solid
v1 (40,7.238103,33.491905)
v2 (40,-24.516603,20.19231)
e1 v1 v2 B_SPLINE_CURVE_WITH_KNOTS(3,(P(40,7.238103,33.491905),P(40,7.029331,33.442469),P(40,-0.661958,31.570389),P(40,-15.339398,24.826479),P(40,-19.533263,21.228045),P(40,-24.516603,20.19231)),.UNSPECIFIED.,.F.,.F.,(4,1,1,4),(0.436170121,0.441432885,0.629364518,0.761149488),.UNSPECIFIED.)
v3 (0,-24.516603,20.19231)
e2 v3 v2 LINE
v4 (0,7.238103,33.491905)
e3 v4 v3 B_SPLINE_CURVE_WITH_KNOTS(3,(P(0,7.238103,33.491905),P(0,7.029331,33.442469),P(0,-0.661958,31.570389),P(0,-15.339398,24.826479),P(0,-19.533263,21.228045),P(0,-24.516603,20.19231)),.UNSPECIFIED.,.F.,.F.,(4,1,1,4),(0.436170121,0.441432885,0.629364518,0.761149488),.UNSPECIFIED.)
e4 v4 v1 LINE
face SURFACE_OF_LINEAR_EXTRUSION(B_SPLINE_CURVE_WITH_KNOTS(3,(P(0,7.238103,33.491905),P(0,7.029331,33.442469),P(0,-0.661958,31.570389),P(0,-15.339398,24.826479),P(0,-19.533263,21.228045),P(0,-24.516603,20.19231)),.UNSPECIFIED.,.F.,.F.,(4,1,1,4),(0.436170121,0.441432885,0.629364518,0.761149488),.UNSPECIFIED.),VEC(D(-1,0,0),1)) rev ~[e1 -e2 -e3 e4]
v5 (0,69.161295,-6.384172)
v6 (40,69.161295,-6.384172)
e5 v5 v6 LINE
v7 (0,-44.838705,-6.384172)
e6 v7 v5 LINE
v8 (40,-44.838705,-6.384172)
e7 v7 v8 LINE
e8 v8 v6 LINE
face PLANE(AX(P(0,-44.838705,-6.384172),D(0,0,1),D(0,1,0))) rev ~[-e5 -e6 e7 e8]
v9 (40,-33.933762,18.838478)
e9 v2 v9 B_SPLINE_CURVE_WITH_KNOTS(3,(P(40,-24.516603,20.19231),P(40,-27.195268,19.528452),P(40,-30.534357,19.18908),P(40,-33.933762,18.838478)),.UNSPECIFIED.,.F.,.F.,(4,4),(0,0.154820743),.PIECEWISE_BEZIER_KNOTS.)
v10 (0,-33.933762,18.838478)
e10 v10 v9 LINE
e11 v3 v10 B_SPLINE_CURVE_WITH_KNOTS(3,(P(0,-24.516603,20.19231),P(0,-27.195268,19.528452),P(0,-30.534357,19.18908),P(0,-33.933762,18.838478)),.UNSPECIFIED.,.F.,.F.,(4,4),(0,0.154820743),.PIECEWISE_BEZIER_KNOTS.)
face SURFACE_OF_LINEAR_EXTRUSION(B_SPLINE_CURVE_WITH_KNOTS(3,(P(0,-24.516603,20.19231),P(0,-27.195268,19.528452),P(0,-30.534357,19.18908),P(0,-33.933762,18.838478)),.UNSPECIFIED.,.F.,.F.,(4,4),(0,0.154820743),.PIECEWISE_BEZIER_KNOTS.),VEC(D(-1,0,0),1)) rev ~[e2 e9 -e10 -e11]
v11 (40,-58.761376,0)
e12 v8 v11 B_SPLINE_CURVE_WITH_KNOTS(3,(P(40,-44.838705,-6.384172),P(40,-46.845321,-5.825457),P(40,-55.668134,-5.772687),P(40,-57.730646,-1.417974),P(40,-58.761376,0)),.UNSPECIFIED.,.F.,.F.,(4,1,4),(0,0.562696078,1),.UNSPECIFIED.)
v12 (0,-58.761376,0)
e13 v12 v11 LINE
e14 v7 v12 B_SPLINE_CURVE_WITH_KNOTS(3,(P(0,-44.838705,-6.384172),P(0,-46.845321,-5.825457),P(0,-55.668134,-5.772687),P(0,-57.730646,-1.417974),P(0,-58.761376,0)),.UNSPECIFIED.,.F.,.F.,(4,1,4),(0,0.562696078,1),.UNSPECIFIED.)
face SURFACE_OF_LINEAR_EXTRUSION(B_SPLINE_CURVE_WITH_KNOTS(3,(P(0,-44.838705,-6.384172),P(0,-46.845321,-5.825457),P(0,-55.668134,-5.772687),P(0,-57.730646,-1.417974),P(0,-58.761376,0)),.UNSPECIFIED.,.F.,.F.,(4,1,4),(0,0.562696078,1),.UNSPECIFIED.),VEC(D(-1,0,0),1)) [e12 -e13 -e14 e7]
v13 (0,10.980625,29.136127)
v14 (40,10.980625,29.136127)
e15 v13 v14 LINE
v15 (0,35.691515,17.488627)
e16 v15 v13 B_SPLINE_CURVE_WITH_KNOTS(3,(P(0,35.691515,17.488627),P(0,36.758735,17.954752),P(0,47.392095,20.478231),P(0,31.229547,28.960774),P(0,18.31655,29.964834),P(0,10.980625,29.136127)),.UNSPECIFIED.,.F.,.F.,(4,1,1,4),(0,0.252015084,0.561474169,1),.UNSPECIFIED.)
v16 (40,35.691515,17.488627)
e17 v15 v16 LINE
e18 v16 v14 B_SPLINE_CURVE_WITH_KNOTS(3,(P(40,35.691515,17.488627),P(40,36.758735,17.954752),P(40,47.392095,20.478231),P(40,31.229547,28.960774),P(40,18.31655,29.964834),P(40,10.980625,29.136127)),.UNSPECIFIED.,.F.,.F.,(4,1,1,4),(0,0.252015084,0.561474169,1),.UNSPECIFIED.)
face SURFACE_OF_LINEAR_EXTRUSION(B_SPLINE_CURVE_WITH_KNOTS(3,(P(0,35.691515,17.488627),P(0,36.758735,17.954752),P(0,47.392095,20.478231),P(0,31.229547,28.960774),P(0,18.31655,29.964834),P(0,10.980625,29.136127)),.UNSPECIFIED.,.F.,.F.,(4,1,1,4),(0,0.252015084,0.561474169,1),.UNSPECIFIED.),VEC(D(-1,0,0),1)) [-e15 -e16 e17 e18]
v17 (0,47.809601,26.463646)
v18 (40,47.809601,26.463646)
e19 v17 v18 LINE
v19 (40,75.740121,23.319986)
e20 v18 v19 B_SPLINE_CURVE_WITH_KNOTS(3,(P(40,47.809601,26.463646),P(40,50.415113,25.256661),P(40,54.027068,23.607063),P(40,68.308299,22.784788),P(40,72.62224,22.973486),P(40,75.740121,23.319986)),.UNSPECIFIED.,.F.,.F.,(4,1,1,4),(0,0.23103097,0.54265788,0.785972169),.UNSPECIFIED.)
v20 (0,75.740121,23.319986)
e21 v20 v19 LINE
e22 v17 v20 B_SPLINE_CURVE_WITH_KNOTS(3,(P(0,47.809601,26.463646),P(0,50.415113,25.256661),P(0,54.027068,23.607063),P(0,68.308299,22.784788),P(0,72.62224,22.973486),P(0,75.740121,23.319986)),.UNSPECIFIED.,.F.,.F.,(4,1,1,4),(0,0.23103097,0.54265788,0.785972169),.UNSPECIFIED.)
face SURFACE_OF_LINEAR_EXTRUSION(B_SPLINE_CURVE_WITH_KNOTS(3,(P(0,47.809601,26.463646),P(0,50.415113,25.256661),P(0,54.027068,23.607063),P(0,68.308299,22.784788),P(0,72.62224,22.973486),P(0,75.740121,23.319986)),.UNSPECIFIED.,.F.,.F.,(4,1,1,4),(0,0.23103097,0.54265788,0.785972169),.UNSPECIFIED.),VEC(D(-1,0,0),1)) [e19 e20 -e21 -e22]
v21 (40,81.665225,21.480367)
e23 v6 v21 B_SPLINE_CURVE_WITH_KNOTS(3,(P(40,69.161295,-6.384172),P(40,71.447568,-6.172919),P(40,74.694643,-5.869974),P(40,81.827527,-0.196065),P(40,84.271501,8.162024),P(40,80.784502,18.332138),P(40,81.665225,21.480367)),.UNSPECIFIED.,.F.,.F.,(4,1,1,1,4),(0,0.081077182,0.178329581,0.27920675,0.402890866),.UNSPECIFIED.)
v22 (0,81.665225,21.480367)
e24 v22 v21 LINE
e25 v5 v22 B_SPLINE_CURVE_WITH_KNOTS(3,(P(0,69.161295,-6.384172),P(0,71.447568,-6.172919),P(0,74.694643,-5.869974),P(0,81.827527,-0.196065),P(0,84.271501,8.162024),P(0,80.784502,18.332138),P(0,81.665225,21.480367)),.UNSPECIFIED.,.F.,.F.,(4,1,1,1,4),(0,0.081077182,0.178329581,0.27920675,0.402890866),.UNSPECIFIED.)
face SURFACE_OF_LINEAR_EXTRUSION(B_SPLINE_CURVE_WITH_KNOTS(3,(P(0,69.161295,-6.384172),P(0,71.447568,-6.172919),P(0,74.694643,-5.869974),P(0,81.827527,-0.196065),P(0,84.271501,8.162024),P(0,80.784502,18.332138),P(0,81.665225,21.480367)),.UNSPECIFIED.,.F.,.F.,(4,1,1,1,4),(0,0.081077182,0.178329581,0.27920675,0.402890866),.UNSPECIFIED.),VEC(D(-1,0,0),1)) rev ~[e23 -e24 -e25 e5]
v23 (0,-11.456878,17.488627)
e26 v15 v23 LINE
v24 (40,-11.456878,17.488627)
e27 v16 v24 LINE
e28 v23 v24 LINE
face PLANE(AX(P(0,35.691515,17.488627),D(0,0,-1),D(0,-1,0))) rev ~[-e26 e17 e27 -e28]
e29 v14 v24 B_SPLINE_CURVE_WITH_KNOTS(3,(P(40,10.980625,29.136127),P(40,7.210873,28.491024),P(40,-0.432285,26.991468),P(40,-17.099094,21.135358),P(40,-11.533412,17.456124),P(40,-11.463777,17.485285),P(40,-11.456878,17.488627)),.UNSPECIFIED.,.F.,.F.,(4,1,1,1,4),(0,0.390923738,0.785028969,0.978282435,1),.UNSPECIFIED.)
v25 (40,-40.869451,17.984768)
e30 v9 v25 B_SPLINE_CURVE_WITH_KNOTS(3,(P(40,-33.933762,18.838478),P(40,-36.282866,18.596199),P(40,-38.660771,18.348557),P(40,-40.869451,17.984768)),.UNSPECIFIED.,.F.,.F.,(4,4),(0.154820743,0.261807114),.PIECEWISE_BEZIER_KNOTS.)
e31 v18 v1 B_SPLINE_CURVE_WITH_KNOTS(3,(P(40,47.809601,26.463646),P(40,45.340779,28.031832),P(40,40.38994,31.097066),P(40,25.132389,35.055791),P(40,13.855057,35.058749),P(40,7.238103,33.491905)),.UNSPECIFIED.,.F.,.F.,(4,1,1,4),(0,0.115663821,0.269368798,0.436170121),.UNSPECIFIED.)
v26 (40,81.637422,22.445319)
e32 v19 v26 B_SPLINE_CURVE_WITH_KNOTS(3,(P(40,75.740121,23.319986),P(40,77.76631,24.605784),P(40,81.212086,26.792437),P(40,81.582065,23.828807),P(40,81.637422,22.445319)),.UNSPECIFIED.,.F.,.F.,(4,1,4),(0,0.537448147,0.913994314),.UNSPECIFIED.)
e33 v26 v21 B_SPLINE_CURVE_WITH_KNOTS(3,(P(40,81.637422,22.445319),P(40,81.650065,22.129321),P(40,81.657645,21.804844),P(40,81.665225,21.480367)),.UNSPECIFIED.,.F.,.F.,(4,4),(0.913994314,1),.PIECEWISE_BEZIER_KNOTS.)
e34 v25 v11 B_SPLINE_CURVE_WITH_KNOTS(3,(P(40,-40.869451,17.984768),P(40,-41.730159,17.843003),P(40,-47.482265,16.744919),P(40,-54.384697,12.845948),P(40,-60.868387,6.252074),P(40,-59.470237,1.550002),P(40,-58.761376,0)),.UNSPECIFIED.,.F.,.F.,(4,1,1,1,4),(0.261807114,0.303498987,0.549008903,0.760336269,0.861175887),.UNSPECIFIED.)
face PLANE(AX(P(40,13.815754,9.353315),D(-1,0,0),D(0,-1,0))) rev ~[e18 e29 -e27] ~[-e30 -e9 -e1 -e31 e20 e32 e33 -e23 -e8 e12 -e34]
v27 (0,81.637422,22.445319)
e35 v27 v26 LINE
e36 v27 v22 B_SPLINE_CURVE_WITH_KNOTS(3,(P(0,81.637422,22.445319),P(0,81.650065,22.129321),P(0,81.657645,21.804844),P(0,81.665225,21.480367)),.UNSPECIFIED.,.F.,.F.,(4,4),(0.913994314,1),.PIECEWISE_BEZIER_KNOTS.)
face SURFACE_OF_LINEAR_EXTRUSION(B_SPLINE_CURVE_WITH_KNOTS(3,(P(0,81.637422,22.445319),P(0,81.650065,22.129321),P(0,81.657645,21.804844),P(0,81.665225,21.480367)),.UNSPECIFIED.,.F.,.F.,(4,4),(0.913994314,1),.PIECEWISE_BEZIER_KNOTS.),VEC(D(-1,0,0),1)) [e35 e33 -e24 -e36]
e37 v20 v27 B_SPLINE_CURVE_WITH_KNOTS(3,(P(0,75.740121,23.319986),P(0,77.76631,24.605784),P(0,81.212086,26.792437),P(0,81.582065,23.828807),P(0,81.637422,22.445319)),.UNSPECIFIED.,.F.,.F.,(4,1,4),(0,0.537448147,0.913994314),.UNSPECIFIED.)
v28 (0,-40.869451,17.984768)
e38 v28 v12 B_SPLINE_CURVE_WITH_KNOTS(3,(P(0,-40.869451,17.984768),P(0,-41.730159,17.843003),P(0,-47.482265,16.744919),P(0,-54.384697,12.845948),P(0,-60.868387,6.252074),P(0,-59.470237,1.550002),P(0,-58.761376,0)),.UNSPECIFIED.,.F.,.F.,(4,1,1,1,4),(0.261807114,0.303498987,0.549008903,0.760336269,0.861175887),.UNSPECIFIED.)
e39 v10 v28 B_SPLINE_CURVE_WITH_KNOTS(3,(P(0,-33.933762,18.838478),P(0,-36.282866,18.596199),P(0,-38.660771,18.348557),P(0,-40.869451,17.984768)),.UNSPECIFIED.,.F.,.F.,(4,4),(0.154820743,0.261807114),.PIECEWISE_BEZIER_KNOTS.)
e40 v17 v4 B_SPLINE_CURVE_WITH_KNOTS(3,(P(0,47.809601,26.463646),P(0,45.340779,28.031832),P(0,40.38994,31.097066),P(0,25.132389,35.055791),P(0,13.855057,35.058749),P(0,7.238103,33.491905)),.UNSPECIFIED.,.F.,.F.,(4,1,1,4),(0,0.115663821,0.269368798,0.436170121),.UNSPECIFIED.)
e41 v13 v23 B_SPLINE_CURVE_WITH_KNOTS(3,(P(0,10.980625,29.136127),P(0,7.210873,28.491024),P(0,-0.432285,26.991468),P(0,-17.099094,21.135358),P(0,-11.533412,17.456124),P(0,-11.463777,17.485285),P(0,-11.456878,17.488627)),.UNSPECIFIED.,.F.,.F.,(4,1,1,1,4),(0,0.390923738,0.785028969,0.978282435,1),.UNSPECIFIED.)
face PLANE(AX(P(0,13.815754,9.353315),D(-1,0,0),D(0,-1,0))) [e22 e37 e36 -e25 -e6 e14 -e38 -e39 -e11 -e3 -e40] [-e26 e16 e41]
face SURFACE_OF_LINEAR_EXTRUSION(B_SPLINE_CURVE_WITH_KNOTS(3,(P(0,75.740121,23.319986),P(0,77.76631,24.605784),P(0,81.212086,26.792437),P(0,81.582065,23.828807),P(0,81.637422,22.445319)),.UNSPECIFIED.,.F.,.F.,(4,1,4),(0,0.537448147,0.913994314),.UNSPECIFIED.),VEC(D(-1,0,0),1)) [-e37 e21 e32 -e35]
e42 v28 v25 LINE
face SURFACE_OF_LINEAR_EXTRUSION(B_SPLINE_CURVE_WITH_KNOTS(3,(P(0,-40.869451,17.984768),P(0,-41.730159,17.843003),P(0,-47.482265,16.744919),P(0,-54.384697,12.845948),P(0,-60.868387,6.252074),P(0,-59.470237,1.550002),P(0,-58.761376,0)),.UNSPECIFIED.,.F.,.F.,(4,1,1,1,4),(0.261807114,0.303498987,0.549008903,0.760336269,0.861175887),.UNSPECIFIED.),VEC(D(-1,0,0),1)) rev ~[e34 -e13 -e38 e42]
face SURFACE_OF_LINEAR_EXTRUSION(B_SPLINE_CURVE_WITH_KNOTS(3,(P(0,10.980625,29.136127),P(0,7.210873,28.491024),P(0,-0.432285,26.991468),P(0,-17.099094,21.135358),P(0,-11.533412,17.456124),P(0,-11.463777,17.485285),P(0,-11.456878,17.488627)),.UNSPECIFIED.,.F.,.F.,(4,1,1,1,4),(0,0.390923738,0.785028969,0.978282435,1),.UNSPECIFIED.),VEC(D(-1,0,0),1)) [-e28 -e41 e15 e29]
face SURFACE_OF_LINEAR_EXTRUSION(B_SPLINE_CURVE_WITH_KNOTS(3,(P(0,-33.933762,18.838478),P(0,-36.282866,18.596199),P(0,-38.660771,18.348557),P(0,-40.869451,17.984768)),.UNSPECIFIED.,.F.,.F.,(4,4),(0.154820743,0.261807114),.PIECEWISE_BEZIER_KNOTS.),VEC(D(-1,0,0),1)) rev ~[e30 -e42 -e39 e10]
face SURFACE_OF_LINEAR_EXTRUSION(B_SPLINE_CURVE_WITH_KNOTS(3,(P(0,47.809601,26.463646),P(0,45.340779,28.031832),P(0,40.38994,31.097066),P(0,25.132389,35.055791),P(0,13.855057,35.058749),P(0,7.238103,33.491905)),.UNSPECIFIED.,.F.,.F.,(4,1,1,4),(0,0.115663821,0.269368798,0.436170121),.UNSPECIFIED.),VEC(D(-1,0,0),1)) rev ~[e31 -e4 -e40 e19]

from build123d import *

# Parameters (mm, degrees)
F1_DEPTH = 40


with BuildPart() as f1:
    # F0 (on Right) → F1 (new body)
    with BuildSketch(Plane.YZ):
        with BuildLine():
            add(Edge.make_bspline(
                [(-44.838704501, -6.3841724768), (-46.8453205455, -5.825457283), (-55.6681341229, -5.7726866527), (-57.7306464731, -1.4179735635), (-58.7613759126, 0)],
                knots=[0, 0, 0, 0, 0.5626960778, 1, 1, 1, 1], degree=3))
            Line((-44.838704501, -6.3841724768), (69.161295499, -6.3841724768))
            add(Edge.make_bspline(
                [(69.161295499, -6.3841724768), (71.4475678954, -6.1729190484), (74.6946425338, -5.8699737813), (81.8275271025, -0.1960649024), (84.2715006558, 8.1620243826), (80.7845015237, 18.3321377417), (81.6652249495, 21.4803665876)],
                knots=[0, 0, 0, 0, 0.0810771817, 0.1783295809, 0.2792067504, 0.4028908662, 0.4028908662, 0.4028908662, 0.4028908662], degree=3))
            add(Edge.make_bspline(
                [(81.6374216797, 22.4453190982), (81.6500654198, 22.1293211952), (81.6576451847, 21.8048438914), (81.6652249495, 21.4803665876)],
                knots=[0.9139943138, 0.9139943138, 0.9139943138, 0.9139943138, 1, 1, 1, 1], degree=3))
            add(Edge.make_bspline(
                [(75.7401209274, 23.3199857175), (78.0850621891, 23.5805863979), (81.1237295684, 23.990384777), (81.6374216797, 22.4453190982)],
                knots=[0.7859721691, 0.7859721691, 0.7859721691, 0.7859721691, 0.9689675221, 0.9689675221, 0.9689675221, 0.9689675221], degree=3))
            add(Edge.make_bspline(
                [(47.8096007504, 26.4636462757), (50.4151132719, 25.2566612425), (54.0270677376, 23.6070629686), (68.3082992802, 22.7847875979), (72.6222400219, 22.9734858293), (75.7401209274, 23.3199857175)],
                knots=[0, 0, 0, 0, 0.2310309702, 0.5426578797, 0.7859721691, 0.7859721691, 0.7859721691, 0.7859721691], degree=3))
            add(Edge.make_bspline(
                [(47.8096007504, 26.4636462757), (38.9469496949, 27.2014516696), (19.8383470871, 30.9230949853), (7.2381034379, 33.4919049177)],
                knots=[0.7500808852, 0.7500808852, 0.7500808852, 0.7500808852, 0.9114828872, 0.9114828872, 0.9114828872, 0.9114828872], degree=3))
            add(Edge.make_bspline(
                [(7.2381034379, 33.4919049177), (7.0293313069, 33.4424692791), (-0.6619575082, 31.5703885813), (-15.3393975904, 24.8264789662), (-19.5332629376, 21.2280452336), (-24.5166032072, 20.1923100725)],
                knots=[0.4361701211, 0.4361701211, 0.4361701211, 0.4361701211, 0.4414328852, 0.6293645181, 0.7611494878, 0.7611494878, 0.7611494878, 0.7611494878], degree=3))
            add(Edge.make_bspline(
                [(-24.5166032072, 20.1923100725), (-27.1952683602, 19.5284516677), (-30.5343573496, 19.1890804899), (-33.9337619399, 18.8384775563)],
                knots=[0, 0, 0, 0, 0.1548207433, 0.1548207433, 0.1548207433, 0.1548207433], degree=3))
            add(Edge.make_bspline(
                [(-33.9337619399, 18.8384775563), (-36.1619029939, 18.5738236368), (-38.5117720873, 18.2998204972), (-40.8694513595, 17.9847684884)],
                knots=[0.82699703, 0.82699703, 0.82699703, 0.82699703, 0.867474623, 0.867474623, 0.867474623, 0.867474623], degree=3))
            add(Edge.make_bspline(
                [(-40.8694513595, 17.9847684884), (-41.7301591235, 17.843002501), (-47.4822650158, 16.7449192121), (-54.3846967183, 12.8459477913), (-60.8683867647, 6.2520742648), (-59.4702371494, 1.5500023351), (-58.7613759126, 0)],
                knots=[0.2618071145, 0.2618071145, 0.2618071145, 0.2618071145, 0.3034989867, 0.5490089029, 0.7603362688, 0.8611758874, 0.8611758874, 0.8611758874, 0.8611758874], degree=3))
        make_face()
        with BuildLine():
            add(Edge.make_bspline(
                [(10.9806247056, 29.136126861), (7.2108730674, 28.4910239279), (-0.4322852797, 26.9914683958), (-17.0990938919, 21.1353577397), (-11.5334123789, 17.4561242614), (-11.4637765201, 17.4852853631), (-11.4568779245, 17.4886267632)],
                knots=[0, 0, 0, 0, 0.3909237382, 0.7850289694, 0.9782824352, 1, 1, 1, 1], degree=3))
            add(Edge.make_bspline(
                [(35.6915146112, 17.4886267632), (36.7587346212, 17.9547515009), (47.3920951695, 20.4782306051), (31.2295468414, 28.9607742297), (18.3165498499, 29.9648338159), (10.9806247056, 29.136126861)],
                knots=[0, 0, 0, 0, 0.2520150835, 0.5614741686, 1, 1, 1, 1], degree=3))
            Line((35.6915146112, 17.4886267632), (21.6614138335, 17.4886267632))
            Line((21.6614138335, 17.4886267632), (-11.4568779245, 17.4886267632))
        make_face(mode=Mode.SUBTRACT)
        with BuildLine():
            add(Edge.make_bspline(
                [(-33.9337619399, 18.8384775563), (-36.2828655116, 18.5961990685), (-38.6607714567, 18.3485571057), (-40.8694513595, 17.9847684884)],
                knots=[0.1548207433, 0.1548207433, 0.1548207433, 0.1548207433, 0.2618071145, 0.2618071145, 0.2618071145, 0.2618071145], degree=3))
            add(Edge.make_bspline(
                [(-33.9337619399, 18.8384775563), (-36.1619029939, 18.5738236368), (-38.5117720873, 18.2998204972), (-40.8694513595, 17.9847684884)],
                knots=[0.82699703, 0.82699703, 0.82699703, 0.82699703, 0.867474623, 0.867474623, 0.867474623, 0.867474623], degree=3))
        make_face()
        with BuildLine():
            add(Edge.make_bspline(
                [(47.8096007504, 26.4636462757), (38.9469496949, 27.2014516696), (19.8383470871, 30.9230949853), (7.2381034379, 33.4919049177)],
                knots=[0.7500808852, 0.7500808852, 0.7500808852, 0.7500808852, 0.9114828872, 0.9114828872, 0.9114828872, 0.9114828872], degree=3))
            add(Edge.make_bspline(
                [(47.8096007504, 26.4636462757), (45.3407789538, 28.0318315658), (40.389939725, 31.0970656548), (25.1323891576, 35.0557908721), (13.8550573864, 35.0587488343), (7.2381034379, 33.4919049177)],
                knots=[0, 0, 0, 0, 0.1156638206, 0.269368798, 0.4361701211, 0.4361701211, 0.4361701211, 0.4361701211], degree=3))
        make_face()
        with BuildLine():
            add(Edge.make_bspline(
                [(75.7401209274, 23.3199857175), (78.0850621891, 23.5805863979), (81.1237295684, 23.990384777), (81.6374216797, 22.4453190982)],
                knots=[0.7859721691, 0.7859721691, 0.7859721691, 0.7859721691, 0.9689675221, 0.9689675221, 0.9689675221, 0.9689675221], degree=3))
            add(Edge.make_bspline(
                [(75.7401209274, 23.3199857175), (77.7663103657, 24.605784142), (81.2120858063, 26.792436855), (81.582065434, 23.8288066823), (81.6374216797, 22.4453190982)],
                knots=[0, 0, 0, 0, 0.5374481469, 0.9139943138, 0.9139943138, 0.9139943138, 0.9139943138], degree=3))
        make_face()
    extrude(amount=F1_DEPTH)


solid = f1.part
